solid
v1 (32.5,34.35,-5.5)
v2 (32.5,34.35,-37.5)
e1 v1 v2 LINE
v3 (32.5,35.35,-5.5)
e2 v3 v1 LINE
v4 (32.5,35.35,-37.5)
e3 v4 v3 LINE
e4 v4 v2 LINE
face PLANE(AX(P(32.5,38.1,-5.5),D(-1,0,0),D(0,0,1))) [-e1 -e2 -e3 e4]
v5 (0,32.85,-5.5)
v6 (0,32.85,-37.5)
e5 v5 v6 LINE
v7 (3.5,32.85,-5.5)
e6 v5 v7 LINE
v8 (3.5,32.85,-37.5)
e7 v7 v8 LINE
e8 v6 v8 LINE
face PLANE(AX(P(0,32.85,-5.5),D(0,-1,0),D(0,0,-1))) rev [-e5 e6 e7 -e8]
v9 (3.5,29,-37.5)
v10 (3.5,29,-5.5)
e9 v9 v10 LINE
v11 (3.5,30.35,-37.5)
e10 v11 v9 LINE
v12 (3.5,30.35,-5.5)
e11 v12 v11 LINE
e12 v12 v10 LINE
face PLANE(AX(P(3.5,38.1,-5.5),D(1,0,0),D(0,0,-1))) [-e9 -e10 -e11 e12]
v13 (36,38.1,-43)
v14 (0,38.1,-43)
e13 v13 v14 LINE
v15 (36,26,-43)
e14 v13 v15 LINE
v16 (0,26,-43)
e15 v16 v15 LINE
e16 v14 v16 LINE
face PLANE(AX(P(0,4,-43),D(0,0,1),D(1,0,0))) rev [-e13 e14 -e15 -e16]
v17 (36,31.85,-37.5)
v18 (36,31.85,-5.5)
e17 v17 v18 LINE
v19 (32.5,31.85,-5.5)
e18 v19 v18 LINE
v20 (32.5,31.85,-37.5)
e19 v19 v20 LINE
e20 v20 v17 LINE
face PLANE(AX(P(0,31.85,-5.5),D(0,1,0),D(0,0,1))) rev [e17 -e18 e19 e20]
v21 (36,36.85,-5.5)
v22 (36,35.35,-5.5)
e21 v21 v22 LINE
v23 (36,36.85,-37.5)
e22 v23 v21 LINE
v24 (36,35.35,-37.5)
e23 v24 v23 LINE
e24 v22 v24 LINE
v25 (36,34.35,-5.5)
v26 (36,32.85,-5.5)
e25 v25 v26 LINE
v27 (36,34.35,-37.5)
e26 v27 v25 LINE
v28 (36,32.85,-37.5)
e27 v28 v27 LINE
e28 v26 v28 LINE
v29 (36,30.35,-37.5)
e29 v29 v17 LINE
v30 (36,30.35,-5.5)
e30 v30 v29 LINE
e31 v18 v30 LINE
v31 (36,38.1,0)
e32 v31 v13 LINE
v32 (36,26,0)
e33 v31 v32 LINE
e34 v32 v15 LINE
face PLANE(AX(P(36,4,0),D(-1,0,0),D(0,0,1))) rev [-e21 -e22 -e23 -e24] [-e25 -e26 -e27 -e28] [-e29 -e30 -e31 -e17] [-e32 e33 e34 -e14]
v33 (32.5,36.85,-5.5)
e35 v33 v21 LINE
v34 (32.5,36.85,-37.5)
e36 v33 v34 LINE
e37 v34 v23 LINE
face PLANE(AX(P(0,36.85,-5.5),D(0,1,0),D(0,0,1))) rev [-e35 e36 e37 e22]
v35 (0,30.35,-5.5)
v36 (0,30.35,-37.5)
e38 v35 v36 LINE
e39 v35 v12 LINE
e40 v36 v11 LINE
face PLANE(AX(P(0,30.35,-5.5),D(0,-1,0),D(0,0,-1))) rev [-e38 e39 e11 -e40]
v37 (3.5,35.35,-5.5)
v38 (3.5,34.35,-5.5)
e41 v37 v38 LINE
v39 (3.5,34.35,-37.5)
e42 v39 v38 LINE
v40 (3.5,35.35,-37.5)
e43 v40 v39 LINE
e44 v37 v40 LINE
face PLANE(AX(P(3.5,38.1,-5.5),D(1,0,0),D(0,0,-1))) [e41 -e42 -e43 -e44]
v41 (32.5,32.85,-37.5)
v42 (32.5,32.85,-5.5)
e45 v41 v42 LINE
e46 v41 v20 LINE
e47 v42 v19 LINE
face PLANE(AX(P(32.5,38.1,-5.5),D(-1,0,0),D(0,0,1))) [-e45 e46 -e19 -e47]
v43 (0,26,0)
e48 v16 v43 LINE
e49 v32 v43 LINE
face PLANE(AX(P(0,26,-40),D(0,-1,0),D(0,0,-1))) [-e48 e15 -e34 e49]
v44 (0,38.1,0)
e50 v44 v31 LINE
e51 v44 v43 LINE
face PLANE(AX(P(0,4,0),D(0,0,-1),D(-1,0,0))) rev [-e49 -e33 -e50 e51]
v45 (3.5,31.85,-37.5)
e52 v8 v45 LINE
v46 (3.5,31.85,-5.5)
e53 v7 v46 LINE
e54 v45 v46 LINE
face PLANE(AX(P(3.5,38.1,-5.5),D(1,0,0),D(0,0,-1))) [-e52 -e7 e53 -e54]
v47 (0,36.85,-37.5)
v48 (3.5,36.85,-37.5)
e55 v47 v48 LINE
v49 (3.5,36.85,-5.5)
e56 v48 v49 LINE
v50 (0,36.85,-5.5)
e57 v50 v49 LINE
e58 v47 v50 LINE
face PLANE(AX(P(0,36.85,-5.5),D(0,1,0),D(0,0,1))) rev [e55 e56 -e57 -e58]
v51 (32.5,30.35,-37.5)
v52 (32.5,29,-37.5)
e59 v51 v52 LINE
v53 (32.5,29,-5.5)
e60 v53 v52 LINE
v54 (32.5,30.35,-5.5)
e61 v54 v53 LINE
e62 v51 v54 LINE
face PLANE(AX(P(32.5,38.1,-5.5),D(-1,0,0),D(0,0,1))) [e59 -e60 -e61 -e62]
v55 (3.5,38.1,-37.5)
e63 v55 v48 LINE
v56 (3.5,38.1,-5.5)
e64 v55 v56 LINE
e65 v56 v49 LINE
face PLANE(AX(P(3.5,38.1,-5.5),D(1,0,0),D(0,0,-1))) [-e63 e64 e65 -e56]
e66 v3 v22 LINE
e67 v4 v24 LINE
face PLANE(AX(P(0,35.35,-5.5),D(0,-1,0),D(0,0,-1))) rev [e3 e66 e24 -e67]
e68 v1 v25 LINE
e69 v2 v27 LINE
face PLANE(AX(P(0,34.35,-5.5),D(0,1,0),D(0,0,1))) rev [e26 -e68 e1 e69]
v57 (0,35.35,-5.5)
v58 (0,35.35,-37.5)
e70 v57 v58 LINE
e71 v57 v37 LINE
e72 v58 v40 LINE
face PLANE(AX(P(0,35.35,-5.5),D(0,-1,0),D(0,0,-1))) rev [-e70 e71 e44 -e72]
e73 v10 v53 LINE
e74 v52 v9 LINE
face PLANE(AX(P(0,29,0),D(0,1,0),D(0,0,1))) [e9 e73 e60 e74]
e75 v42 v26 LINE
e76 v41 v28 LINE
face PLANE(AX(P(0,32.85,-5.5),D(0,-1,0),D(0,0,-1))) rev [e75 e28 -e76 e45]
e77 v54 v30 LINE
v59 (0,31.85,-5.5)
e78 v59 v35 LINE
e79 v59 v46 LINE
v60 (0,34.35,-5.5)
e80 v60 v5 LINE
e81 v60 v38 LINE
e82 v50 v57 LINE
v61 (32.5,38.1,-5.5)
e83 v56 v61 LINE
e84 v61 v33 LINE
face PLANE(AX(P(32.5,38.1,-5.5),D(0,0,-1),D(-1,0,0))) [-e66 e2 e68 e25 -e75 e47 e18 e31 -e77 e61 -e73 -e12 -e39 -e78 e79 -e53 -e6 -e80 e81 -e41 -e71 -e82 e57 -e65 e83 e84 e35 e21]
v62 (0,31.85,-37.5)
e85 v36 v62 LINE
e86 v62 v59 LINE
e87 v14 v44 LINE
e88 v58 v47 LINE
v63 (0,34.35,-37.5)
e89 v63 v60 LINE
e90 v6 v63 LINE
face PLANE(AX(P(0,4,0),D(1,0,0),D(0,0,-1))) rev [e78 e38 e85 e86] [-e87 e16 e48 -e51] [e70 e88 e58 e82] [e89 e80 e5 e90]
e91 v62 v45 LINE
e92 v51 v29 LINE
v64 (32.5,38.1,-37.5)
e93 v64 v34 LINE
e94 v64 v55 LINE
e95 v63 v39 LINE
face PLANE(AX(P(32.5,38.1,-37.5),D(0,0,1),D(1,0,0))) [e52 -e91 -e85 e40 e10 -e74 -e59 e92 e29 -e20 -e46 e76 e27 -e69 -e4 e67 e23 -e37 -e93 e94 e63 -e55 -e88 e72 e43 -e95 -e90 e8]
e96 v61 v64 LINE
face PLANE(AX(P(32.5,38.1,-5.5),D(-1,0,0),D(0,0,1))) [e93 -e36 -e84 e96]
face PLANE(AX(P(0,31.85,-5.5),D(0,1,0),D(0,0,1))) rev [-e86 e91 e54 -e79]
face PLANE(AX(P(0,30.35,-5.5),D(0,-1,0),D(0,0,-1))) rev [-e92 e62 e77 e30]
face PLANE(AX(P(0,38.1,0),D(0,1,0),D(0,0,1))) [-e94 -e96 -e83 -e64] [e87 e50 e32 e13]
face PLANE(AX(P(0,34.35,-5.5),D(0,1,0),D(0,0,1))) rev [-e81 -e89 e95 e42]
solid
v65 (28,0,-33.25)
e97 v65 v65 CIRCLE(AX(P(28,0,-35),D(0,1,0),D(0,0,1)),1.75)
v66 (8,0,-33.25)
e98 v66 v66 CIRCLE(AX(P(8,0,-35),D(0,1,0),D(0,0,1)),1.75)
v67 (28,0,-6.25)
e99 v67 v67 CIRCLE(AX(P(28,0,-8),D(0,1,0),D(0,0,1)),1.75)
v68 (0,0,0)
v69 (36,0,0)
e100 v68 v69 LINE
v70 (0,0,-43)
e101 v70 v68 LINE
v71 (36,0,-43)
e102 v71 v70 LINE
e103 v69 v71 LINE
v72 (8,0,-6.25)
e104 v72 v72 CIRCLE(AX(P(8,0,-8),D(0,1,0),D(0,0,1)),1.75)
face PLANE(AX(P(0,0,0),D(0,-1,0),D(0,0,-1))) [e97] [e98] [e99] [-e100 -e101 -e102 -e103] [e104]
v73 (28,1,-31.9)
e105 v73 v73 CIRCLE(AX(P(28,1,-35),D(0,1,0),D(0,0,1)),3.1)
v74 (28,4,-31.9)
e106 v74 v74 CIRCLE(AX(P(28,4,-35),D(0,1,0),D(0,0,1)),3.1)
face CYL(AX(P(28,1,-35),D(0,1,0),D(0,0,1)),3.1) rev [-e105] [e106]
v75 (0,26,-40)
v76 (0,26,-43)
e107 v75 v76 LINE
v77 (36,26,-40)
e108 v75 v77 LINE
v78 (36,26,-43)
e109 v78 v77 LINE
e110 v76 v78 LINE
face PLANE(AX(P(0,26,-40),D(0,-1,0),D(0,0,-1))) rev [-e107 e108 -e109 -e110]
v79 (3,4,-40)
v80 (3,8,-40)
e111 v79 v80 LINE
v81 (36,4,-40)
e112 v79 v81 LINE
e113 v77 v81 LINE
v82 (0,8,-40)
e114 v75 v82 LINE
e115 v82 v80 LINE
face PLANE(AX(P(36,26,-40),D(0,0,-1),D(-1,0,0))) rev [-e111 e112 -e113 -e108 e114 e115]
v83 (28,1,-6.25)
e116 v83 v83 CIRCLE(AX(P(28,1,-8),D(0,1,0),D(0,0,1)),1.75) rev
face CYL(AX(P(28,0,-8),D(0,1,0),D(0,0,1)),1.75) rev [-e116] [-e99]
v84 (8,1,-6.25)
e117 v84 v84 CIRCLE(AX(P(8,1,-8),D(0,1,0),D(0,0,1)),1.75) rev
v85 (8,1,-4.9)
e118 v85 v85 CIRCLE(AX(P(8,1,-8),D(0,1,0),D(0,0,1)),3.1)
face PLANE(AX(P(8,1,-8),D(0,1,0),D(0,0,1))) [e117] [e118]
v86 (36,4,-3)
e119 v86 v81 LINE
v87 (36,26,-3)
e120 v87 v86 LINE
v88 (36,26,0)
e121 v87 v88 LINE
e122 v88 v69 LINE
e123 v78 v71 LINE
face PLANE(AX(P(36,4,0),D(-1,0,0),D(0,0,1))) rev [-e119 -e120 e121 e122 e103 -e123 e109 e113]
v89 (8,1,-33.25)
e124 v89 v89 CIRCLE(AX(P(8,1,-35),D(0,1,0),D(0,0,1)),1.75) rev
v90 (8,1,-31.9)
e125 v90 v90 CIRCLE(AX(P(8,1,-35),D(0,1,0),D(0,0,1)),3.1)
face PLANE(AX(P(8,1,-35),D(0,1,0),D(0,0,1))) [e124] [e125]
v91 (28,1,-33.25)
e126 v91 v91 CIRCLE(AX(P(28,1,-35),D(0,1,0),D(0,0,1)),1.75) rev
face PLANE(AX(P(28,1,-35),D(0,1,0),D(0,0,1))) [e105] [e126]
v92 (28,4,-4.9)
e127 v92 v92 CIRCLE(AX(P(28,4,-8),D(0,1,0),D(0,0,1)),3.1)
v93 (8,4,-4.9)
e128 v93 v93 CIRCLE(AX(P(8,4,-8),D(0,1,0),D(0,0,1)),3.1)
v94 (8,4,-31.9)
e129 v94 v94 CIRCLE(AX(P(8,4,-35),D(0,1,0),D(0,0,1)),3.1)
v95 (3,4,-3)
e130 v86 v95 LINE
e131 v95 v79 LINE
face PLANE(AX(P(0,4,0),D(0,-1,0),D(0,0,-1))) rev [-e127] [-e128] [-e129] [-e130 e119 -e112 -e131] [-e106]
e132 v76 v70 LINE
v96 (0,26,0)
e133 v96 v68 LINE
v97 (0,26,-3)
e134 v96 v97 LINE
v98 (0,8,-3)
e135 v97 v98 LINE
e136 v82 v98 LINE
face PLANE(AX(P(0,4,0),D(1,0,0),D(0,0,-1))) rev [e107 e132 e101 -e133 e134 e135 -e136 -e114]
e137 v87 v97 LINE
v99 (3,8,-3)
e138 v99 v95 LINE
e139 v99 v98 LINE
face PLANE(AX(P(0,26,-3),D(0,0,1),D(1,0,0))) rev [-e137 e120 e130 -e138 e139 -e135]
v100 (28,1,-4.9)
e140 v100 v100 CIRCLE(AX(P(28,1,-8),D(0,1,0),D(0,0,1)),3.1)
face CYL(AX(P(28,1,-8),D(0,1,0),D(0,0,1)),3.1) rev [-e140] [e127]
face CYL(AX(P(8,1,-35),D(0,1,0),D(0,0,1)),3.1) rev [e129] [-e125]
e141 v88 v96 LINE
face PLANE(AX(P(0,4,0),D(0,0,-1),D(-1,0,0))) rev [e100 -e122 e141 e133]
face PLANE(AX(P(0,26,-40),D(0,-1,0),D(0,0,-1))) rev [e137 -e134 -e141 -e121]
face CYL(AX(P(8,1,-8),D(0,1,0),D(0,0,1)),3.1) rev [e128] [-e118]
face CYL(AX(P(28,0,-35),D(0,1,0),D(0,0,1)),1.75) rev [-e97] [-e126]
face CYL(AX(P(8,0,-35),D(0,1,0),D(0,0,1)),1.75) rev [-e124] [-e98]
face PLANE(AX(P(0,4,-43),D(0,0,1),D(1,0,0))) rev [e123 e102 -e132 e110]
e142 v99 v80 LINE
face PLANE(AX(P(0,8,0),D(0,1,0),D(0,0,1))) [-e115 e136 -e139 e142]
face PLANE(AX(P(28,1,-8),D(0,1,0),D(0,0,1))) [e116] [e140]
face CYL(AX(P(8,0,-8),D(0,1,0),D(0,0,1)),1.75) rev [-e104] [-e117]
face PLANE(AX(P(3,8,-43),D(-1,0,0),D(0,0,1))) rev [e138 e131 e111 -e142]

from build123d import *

# Parameters (mm, degrees)
CROQUIS1_W                 = 36
CROQUIS1_H                 = 43
SALIENTE_EXTRUIR4_DEPTH    = 4
CROQUIS6_W                 = 36
CROQUIS6_H                 = 3
SALIENTE_EXTRUIR5_DEPTH    = 22
CROQUIS7_W                 = 36
CROQUIS7_H                 = 43
SALIENTE_EXTRUIR6_DEPTH    = 3
CROQUIS8_W                 = 3
CROQUIS8_H                 = 43
SALIENTE_EXTRUIR7_DEPTH    = 4
CROQUIS9_W                 = 36
CROQUIS9_H                 = 43
CROQUIS9_W_2               = 29
CROQUIS9_H_2               = 32
SALIENTE_EXTRUIR8_DEPTH    = 9.1
CORTAR_EXTRUIR1_DEPTH      = 67.00651483
CORTAR_EXTRUIR1_DEPTH_BACK = 67.00651483
CROQUIS10_W                = 32
CROQUIS10_H                = 1.5
CROQUIS12_R                = 1.75
CORTAR_EXTRUIR2_DEPTH      = 66.633908919
CROQUIS13_R                = 3.1
CORTAR_EXTRUIR3_DEPTH      = 3


# Read off the part's stored shape, not the designer's step: Partir1
with BuildPart() as part:
    # Croquis1 → Saliente-Extruir4 (new body)
    with BuildSketch(Plane(origin=(0, 0, 0), x_dir=(1, 0, 0), z_dir=(0, 1, 0))):
        with Locations((18, 21.5)):
            Rectangle(CROQUIS1_W, CROQUIS1_H)
    extrude(amount=SALIENTE_EXTRUIR4_DEPTH)

    # Croquis6 → Saliente-Extruir5 (add)
    with BuildSketch(Plane(origin=(0, 4, 0), x_dir=(1, 0, 0), z_dir=(0, 1, 0))):
        with Locations((18, 41.5)):
            Rectangle(CROQUIS6_W, CROQUIS6_H)
        with Locations((18, 1.5)):
            Rectangle(CROQUIS6_W, CROQUIS6_H)
    extrude(amount=SALIENTE_EXTRUIR5_DEPTH)

    # Croquis7 → Saliente-Extruir6 (add)
    with BuildSketch(Plane(origin=(0, 26, 0), x_dir=(1, 0, 0), z_dir=(0, 1, 0))):
        with Locations((18, 21.5)):
            Rectangle(CROQUIS7_W, CROQUIS7_H)
    extrude(amount=SALIENTE_EXTRUIR6_DEPTH)

    # Croquis8 → Saliente-Extruir7 (add)
    with BuildSketch(Plane(origin=(0, 4, 0), x_dir=(1, 0, 0), z_dir=(0, 1, 0))):
        with Locations((1.5, 21.5)):
            Rectangle(CROQUIS8_W, CROQUIS8_H)
    extrude(amount=SALIENTE_EXTRUIR7_DEPTH)

    # Croquis9 → Saliente-Extruir8 (add)
    with BuildSketch(Plane(origin=(0, 29, 0), x_dir=(1, 0, 0), z_dir=(0, 1, 0))):
        with Locations((18, 21.5)):
            Rectangle(CROQUIS9_W, CROQUIS9_H)
        with Locations((18, 21.5)):
            Rectangle(CROQUIS9_W_2, CROQUIS9_H_2, mode=Mode.SUBTRACT)
    extrude(amount=SALIENTE_EXTRUIR8_DEPTH)

    # Croquis10 → Cortar-Extruir1 (cut, two sides: drawn at the far end of the back side and taken through both)
    with BuildSketch(Plane(origin=(3.5, 0, 0), x_dir=(0, 0, -1), z_dir=(1, 0, 0)).offset(-CORTAR_EXTRUIR1_DEPTH_BACK)):
        with Locations((21.5, 36.1)):
            Rectangle(CROQUIS10_W, CROQUIS10_H)
        with Locations((21.5, 33.6)):
            Rectangle(CROQUIS10_W, CROQUIS10_H)
        with Locations((21.5, 31.1)):
            Rectangle(CROQUIS10_W, CROQUIS10_H)
    extrude(amount=CORTAR_EXTRUIR1_DEPTH + CORTAR_EXTRUIR1_DEPTH_BACK, mode=Mode.SUBTRACT)

    # Croquis12 → Cortar-Extruir2 (cut, through all)
    with BuildSketch(Plane(origin=(0, 4, 0), x_dir=(1, 0, 0), z_dir=(0, 1, 0))):
        with Locations(Location((8, 35, 0), (0, 0, 270))):
            Circle(CROQUIS12_R)
        with Locations(Location((28, 35, 0), (0, 0, 270))):
            Circle(CROQUIS12_R)
        with Locations(Location((8, 8, 0), (0, 0, 270))):
            Circle(CROQUIS12_R)
        with Locations(Location((28, 8, 0), (0, 0, 270))):
            Circle(CROQUIS12_R)
    extrude(amount=-CORTAR_EXTRUIR2_DEPTH, mode=Mode.SUBTRACT)

    # Croquis13 → Cortar-Extruir3 (cut)
    with BuildSketch(Plane(origin=(0, 4, 0), x_dir=(1, 0, 0), z_dir=(0, 1, 0))):
        with Locations(Location((8, 35, 0), (0, 0, 270))):
            Circle(CROQUIS13_R)
        with Locations(Location((28, 35, 0), (0, 0, 270))):
            Circle(CROQUIS13_R)
        with Locations(Location((28, 8, 0), (0, 0, 270))):
            Circle(CROQUIS13_R)
        with Locations(Location((8, 8, 0), (0, 0, 270))):
            Circle(CROQUIS13_R)
    extrude(amount=-CORTAR_EXTRUIR3_DEPTH, mode=Mode.SUBTRACT)


with BuildPart() as body_2:
    # Partir1: the piece on the far side of the plane
    add(part.part)
    split(bisect_by=Plane(origin=(0, 26, 0), x_dir=(1, 0, 0), z_dir=(0, 1, 0)), keep=Keep.BOTTOM)


with BuildPart() as part_1:
    add(part.part)

    # Partir1
    split(bisect_by=Plane(origin=(0, 26, 0), x_dir=(1, 0, 0), z_dir=(0, 1, 0)), keep=Keep.TOP)


solid = Compound([body_2.part, part_1.part])
